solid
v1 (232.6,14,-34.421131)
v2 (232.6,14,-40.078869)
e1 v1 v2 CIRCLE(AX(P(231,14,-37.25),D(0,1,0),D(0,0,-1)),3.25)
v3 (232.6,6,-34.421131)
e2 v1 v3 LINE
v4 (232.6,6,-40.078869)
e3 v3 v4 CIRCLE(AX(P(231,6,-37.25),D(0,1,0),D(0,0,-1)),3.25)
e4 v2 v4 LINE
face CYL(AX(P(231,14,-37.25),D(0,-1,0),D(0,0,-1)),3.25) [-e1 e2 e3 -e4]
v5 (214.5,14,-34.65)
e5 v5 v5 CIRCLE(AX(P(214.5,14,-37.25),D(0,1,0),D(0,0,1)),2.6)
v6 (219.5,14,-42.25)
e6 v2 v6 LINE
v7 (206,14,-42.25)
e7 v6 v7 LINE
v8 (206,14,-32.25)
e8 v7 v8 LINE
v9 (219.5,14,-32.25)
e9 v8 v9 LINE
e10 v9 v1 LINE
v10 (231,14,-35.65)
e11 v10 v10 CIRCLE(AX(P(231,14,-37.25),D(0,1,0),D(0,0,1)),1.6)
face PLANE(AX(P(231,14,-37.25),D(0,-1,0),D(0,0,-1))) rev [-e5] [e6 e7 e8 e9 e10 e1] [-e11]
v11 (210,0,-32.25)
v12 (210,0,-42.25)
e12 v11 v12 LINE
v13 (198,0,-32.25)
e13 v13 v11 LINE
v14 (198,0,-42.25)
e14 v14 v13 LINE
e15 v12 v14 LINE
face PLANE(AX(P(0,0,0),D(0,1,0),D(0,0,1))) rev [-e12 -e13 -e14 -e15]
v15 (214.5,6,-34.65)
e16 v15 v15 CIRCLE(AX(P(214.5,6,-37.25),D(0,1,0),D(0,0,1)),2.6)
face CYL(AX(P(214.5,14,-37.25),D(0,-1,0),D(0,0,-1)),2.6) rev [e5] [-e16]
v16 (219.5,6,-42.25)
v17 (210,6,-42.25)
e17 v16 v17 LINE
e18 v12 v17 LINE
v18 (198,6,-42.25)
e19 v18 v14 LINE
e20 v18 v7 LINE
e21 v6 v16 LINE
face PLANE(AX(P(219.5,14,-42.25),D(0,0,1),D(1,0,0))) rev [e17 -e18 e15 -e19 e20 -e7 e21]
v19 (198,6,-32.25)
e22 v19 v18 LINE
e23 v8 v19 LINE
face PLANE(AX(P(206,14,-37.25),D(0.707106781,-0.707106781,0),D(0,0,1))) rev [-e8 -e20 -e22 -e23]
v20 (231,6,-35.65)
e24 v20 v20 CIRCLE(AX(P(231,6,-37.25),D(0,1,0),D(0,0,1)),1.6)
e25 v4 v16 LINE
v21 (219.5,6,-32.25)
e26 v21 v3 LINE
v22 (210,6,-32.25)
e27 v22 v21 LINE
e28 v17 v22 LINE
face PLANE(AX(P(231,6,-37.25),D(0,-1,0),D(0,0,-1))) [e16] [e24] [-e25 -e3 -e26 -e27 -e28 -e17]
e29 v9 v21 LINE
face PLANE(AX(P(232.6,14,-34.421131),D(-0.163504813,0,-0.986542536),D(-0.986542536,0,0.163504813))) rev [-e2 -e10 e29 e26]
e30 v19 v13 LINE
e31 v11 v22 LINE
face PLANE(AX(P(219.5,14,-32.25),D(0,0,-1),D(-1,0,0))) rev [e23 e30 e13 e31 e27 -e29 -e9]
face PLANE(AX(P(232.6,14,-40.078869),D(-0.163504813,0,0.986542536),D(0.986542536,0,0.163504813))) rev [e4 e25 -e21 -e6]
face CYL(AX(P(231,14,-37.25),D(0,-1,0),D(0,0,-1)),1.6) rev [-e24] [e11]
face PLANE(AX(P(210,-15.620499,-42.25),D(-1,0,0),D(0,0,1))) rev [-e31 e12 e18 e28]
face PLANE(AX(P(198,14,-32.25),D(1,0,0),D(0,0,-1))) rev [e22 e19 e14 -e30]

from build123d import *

# Parameters (mm, degrees)
SKETCH1_R             = 5.9875
SKETCH1_R_2           = 1.7
SKETCH1_R_3           = 1.6
BOSS_EXTRUDE1_DEPTH   = 6
MOVE_FACE1_BY         = 5
MOVE_FACE1_2_BY       = 5
MOVE_FACE1_3_BY       = 5
MOVE_FACE1_4_BY       = 5
M4X0_7_TAPPED_HOLE2_D = 3.3
POCKET_WALLS_DEPTH    = 2.6
RIB_PATTERN_DEPTH     = 3
MOVE_FACE2_BY         = 4.5
MOVE_FACE2_2_BY       = 4.5
MOVE_FACE2_3_BY       = 4.5
MOVE_FACE2_4_BY       = 4.5
MOVE_FACE2_5_BY       = 4.5
MOVE_FACE2_6_BY       = 4.5
MOVE_FACE2_7_BY       = 4.5
MOVE_FACE2_8_BY       = 4.5
MOVE_FACE2_9_BY       = 4.5
MOVE_FACE2_10_BY      = 4.5
MOVE_FACE2_11_BY      = 4.5
MOVE_FACE2_12_BY      = 4.5
MOVE_FACE2_13_BY      = 4.5
MOVE_FACE2_14_BY      = 4.5
BOSS_EXTRUDE6_REACH   = 382.427
SKETCH19_W            = 1
SKETCH19_H            = 3
BOSS_EXTRUDE7_REACH   = 375.768
SKETCH20_W            = 1
SKETCH20_H            = 3
CUT_EXTRUDE4_DEPTH    = 4.5
POCKET_FILLETS_R      = 2.5
FILLET9_R             = 3
MOVE_FACE3_BY         = 12
MOVE_FACE3_2_BY       = 12
SKETCH23_W            = 12
SKETCH23_H            = 38.175
CUT_EXTRUDE5_DEPTH    = 245.489391385
MOVE_FACE4_BY         = 4
MOVE_FACE4_2_BY       = 4
FILLET6_R             = 5
FILLET7_R             = 11
FILLET8_START         = -1
FILLET8_DEPTH         = 8
FILLET8_2_DEPTH       = 6
SKETCH25_R            = 1.6
SKETCH25_R_2          = 2.6
BOSS_EXTRUDE9_DEPTH   = 8
SKETCH26_W            = 12
SKETCH26_H            = 10
BOSS_EXTRUDE10_DEPTH  = 6
CHAMFER2_SIZE         = 8


with BuildPart() as part:
    # Sketch1 → Boss-Extrude1 (new body)
    with BuildSketch(Plane(origin=(0, 0, 0), x_dir=(1, 0, 0), z_dir=(0, 1, 0))):
        Polygon((-240, 46.25), (-198, 46.25), (-198, 26.5), (198, 26.5), (198, 46.25), (240, 46.25), (240, -18.75), (201, -18.75), (201, 0), (-201, 0), (-201, -18.75), (-240, -18.75), align=None)
        with Locations(Location((-231, 24.425, 0), (0, 0, 270))):
            Circle(SKETCH1_R, mode=Mode.SUBTRACT)
        with Locations(Location((-214.5, 37.25, 0), (0, 0, 270))):
            Circle(SKETCH1_R, mode=Mode.SUBTRACT)
        with Locations(Location((214.5, 37.25, 0), (0, 0, 90))):
            Circle(SKETCH1_R, mode=Mode.SUBTRACT)
        with Locations(Location((231, 24.425, 0), (0, 0, 90))):
            Circle(SKETCH1_R, mode=Mode.SUBTRACT)
        with Locations(Location((-204.5, -6.05, 0), (0, 0, 270))):
            Circle(SKETCH1_R_2, mode=Mode.SUBTRACT)
        with Locations(Location((-224.5, -6.05, 0), (0, 0, 270))):
            Circle(SKETCH1_R_2, mode=Mode.SUBTRACT)
        with Locations(Location((-204.5, 13.95, 0), (0, 0, 270))):
            Circle(SKETCH1_R_2, mode=Mode.SUBTRACT)
        with Locations(Location((-224.5, 13.95, 0), (0, 0, 270))):
            Circle(SKETCH1_R_2, mode=Mode.SUBTRACT)
        with Locations(Location((204.5, -6.05, 0), (0, 0, 90))):
            Circle(SKETCH1_R_2, mode=Mode.SUBTRACT)
        with Locations(Location((204.5, 13.95, 0), (0, 0, 90))):
            Circle(SKETCH1_R_2, mode=Mode.SUBTRACT)
        with Locations(Location((224.5, 13.95, 0), (0, 0, 90))):
            Circle(SKETCH1_R_2, mode=Mode.SUBTRACT)
        with Locations(Location((224.5, -6.05, 0), (0, 0, 90))):
            Circle(SKETCH1_R_2, mode=Mode.SUBTRACT)
        with Locations(Location((-187.5, 13.25, 0), (0, 0, 270))):
            Circle(SKETCH1_R_3, mode=Mode.SUBTRACT)
        with Locations(Location((-162.5, 13.25, 0), (0, 0, 270))):
            Circle(SKETCH1_R_3, mode=Mode.SUBTRACT)
        with Locations(Location((-137.5, 13.25, 0), (0, 0, 270))):
            Circle(SKETCH1_R_3, mode=Mode.SUBTRACT)
        with Locations(Location((-112.5, 13.25, 0), (0, 0, 270))):
            Circle(SKETCH1_R_3, mode=Mode.SUBTRACT)
        with Locations(Location((-87.5, 13.25, 0), (0, 0, 270))):
            Circle(SKETCH1_R_3, mode=Mode.SUBTRACT)
        with Locations(Location((-62.5, 13.25, 0), (0, 0, 270))):
            Circle(SKETCH1_R_3, mode=Mode.SUBTRACT)
        with Locations(Location((-37.5, 13.25, 0), (0, 0, 270))):
            Circle(SKETCH1_R_3, mode=Mode.SUBTRACT)
        with Locations(Location((-12.5, 13.25, 0), (0, 0, 270))):
            Circle(SKETCH1_R_3, mode=Mode.SUBTRACT)
        with Locations(Location((12.5, 13.25, 0), (0, 0, 270))):
            Circle(SKETCH1_R_3, mode=Mode.SUBTRACT)
        with Locations(Location((37.5, 13.25, 0), (0, 0, 270))):
            Circle(SKETCH1_R_3, mode=Mode.SUBTRACT)
        with Locations(Location((62.5, 13.25, 0), (0, 0, 270))):
            Circle(SKETCH1_R_3, mode=Mode.SUBTRACT)
        with Locations(Location((87.5, 13.25, 0), (0, 0, 270))):
            Circle(SKETCH1_R_3, mode=Mode.SUBTRACT)
        with Locations(Location((112.5, 13.25, 0), (0, 0, 270))):
            Circle(SKETCH1_R_3, mode=Mode.SUBTRACT)
        with Locations(Location((137.5, 13.25, 0), (0, 0, 270))):
            Circle(SKETCH1_R_3, mode=Mode.SUBTRACT)
        with Locations(Location((-231, 37.25, 0), (0, 0, 270))):
            Circle(SKETCH1_R_3, mode=Mode.SUBTRACT)
        with Locations(Location((231, 37.25, 0), (0, 0, 90))):
            Circle(SKETCH1_R_3, mode=Mode.SUBTRACT)
        with Locations(Location((162.5, 13.25, 0), (0, 0, 270))):
            Circle(SKETCH1_R_3, mode=Mode.SUBTRACT)
        with Locations(Location((187.5, 13.25, 0), (0, 0, 270))):
            Circle(SKETCH1_R_3, mode=Mode.SUBTRACT)
    extrude(amount=BOSS_EXTRUDE1_DEPTH)

    # Move Face1: a curved face moved outward by 5.0
    add(Solid.thicken(part.faces().sort_by_distance((231, 3, -18.4375))[0], MOVE_FACE1_BY))

    # Move Face1 2: a curved face moved outward by 5.0
    add(Solid.thicken(part.faces().sort_by_distance((214.5, 3, -31.2625))[0], MOVE_FACE1_2_BY))

    # Move Face1 3: a curved face moved outward by 5.0
    add(Solid.thicken(part.faces().sort_by_distance((-214.5, 3, -43.2375))[0], MOVE_FACE1_3_BY))

    # Move Face1 4: a curved face moved outward by 5.0
    add(Solid.thicken(part.faces().sort_by_distance((-231, 3, -30.4125))[0], MOVE_FACE1_4_BY))

    # M4x0.7 Tapped Hole2 (through all)
    with Locations(Plane(origin=(0, 6, 0), x_dir=(1, 0, 0), z_dir=(0, 1, 0))):
        with Locations((-214.5, 37.25), (-231, 24.425), (231, 24.425), (214.5, 37.25)):
            Hole(M4X0_7_TAPPED_HOLE2_D / 2)

    # Sketch13 → Pocket Walls (add)
    with BuildSketch(Plane.XY):
        Polygon((-214, 6), (-208.803847577, 9), (208.803847577, 9), (214, 6), align=None)
    pocket_walls = extrude(amount=-POCKET_WALLS_DEPTH)

    # Mirror1: Pocket Walls across plane
    add(pocket_walls.mirror(Plane.XY.offset(-13.25)))

    # zig_zag_style_1 → Rib Pattern (add)
    with BuildSketch(Plane(origin=(0, 6, 0), x_dir=(1, 0, 0), z_dir=(0, 1, 0))):
        Polygon((-186.851468198, 1.838812439), (-162.5, 22.586263345), (-137.5, 1.286263345), (-112.5, 22.586263345), (-87.5, 1.286263345), (-62.5, 22.586263345), (-37.5, 1.286263345), (-12.5, 22.586263345), (12.5, 1.286263345), (37.5, 22.586263345), (62.5, 1.286263345), (87.5, 22.586263345), (112.5, 1.286263345), (137.5, 22.586263345), (162.5, 1.286263345), (188.148531802, 23.138812439), (186.851468198, 24.661187561), (162.5, 3.913736655), (137.5, 25.213736655), (112.5, 3.913736655), (87.5, 25.213736655), (62.5, 3.913736655), (37.5, 25.213736655), (12.5, 3.913736655), (-12.5, 25.213736655), (-37.5, 3.913736655), (-62.5, 25.213736655), (-87.5, 3.913736655), (-112.5, 25.213736655), (-137.5, 3.913736655), (-162.5, 25.213736655), (-188.148531802, 3.361187561), align=None)
    extrude(amount=RIB_PATTERN_DEPTH)

    # Move Face2: a face moved inward by 4.5
    extrude(part.faces().sort_by_distance((162.5, 6, -17.307514961))[0], amount=MOVE_FACE2_BY, dir=(0, -1, 0), mode=Mode.SUBTRACT)

    # Move Face2 2: a face moved inward by 4.5
    extrude(part.faces().sort_by_distance((137.5, 6, -9.192485039))[0], amount=MOVE_FACE2_2_BY, dir=(0, -1, 0), mode=Mode.SUBTRACT)

    # Move Face2 3: a face moved inward by 4.5
    extrude(part.faces().sort_by_distance((112.5, 6, -17.307514961))[0], amount=MOVE_FACE2_3_BY, dir=(0, -1, 0), mode=Mode.SUBTRACT)

    # Move Face2 4: a face moved inward by 4.5
    extrude(part.faces().sort_by_distance((87.5, 6, -9.192485039))[0], amount=MOVE_FACE2_4_BY, dir=(0, -1, 0), mode=Mode.SUBTRACT)

    # Move Face2 5: a face moved inward by 4.5
    extrude(part.faces().sort_by_distance((62.5, 6, -17.307514961))[0], amount=MOVE_FACE2_5_BY, dir=(0, -1, 0), mode=Mode.SUBTRACT)

    # Move Face2 6: a face moved inward by 4.5
    extrude(part.faces().sort_by_distance((37.5, 6, -9.192485039))[0], amount=MOVE_FACE2_6_BY, dir=(0, -1, 0), mode=Mode.SUBTRACT)

    # Move Face2 7: a face moved inward by 4.5
    extrude(part.faces().sort_by_distance((12.5, 6, -17.307514961))[0], amount=MOVE_FACE2_7_BY, dir=(0, -1, 0), mode=Mode.SUBTRACT)

    # Move Face2 8: a face moved inward by 4.5
    extrude(part.faces().sort_by_distance((-12.5, 6, -9.192485039))[0], amount=MOVE_FACE2_8_BY, dir=(0, -1, 0), mode=Mode.SUBTRACT)

    # Move Face2 9: a face moved inward by 4.5
    extrude(part.faces().sort_by_distance((-37.5, 6, -17.307514961))[0], amount=MOVE_FACE2_9_BY, dir=(0, -1, 0), mode=Mode.SUBTRACT)

    # Move Face2 10: a face moved inward by 4.5
    extrude(part.faces().sort_by_distance((-62.5, 6, -9.192485039))[0], amount=MOVE_FACE2_10_BY, dir=(0, -1, 0), mode=Mode.SUBTRACT)

    # Move Face2 11: a face moved inward by 4.5
    extrude(part.faces().sort_by_distance((-87.5, 6, -17.307514961))[0], amount=MOVE_FACE2_11_BY, dir=(0, -1, 0), mode=Mode.SUBTRACT)

    # Move Face2 12: a face moved inward by 4.5
    extrude(part.faces().sort_by_distance((-112.5, 6, -9.192485039))[0], amount=MOVE_FACE2_12_BY, dir=(0, -1, 0), mode=Mode.SUBTRACT)

    # Move Face2 13: a face moved inward by 4.5
    extrude(part.faces().sort_by_distance((-162.5, 6, -9.192485039))[0], amount=MOVE_FACE2_13_BY, dir=(0, -1, 0), mode=Mode.SUBTRACT)

    # Move Face2 14: a face moved inward by 4.5
    extrude(part.faces().sort_by_distance((-137.5, 6, -17.307514961))[0], amount=MOVE_FACE2_14_BY, dir=(0, -1, 0), mode=Mode.SUBTRACT)

    # Boss-Extrude6: up to this face of the body (flat: up to its plane)
    boss_extrude6_end = Plane(part.part.faces().sort_by_distance((199.498029235, 7.445651316, -23.9))[0])
    # Sketch19 → Boss-Extrude6 (add, up to the picked face)
    with BuildSketch(Plane(origin=(120.437057913, 0, -102.612373342), x_dir=(-0.6485318015860708, 0, -0.7611875605470214), z_dir=(0.7611875605470213, 0, -0.6485318015860707)), mode=Mode.PRIVATE) as boss_extrude6_sk1:
        with Locations((-103.9073301, 7.5)):
            Rectangle(SKETCH19_W, SKETCH19_H)
    boss_extrude6_tool1 = split(extrude(boss_extrude6_sk1.sketch, amount=BOSS_EXTRUDE6_REACH, mode=Mode.PRIVATE), bisect_by=boss_extrude6_end, keep=Keep.BOTH, mode=Mode.PRIVATE)
    add(boss_extrude6_tool1.solids().sort_by(Axis((187.824266, 7.5, -23.519406), (0.7611875605470213, 0, -0.6485318015860707)))[0])

    # Boss-Extrude7: up to this face of the body (flat: up to its plane)
    boss_extrude7_end = Plane(part.part.faces().sort_by_distance((-199.498029235, 7.445651316, -2.6))[0])
    # Sketch20 → Boss-Extrude7 (add, up to the picked face)
    with BuildSketch(Plane(origin=(-107.355217903, 0, 91.466645654), x_dir=(0.6485318015860708, 0, 0.7611875605470213), z_dir=(-0.7611875605470213, 0, 0.6485318015860708)), mode=Mode.PRIVATE) as boss_extrude7_sk1:
        with Locations((-124.078800455, 7.5)):
            Rectangle(SKETCH20_W, SKETCH20_H)
    boss_extrude7_tool1 = split(extrude(boss_extrude7_sk1.sketch, amount=BOSS_EXTRUDE7_REACH, mode=Mode.PRIVATE), bisect_by=boss_extrude7_end, keep=Keep.BOTH, mode=Mode.PRIVATE)
    add(boss_extrude7_tool1.solids().sort_by(Axis((-187.824266, 7.5, -2.980594), (-0.7611875605470213, 0, 0.6485318015860708)))[0])

    # Sketch22 → Cut-Extrude4 (cut)
    with BuildSketch(Plane(origin=(0, 6, 0), x_dir=(1, 0, 0), z_dir=(0, 1, 0))):
        Polygon((-201, 2.6), (-201, 23.9), (-164.041944431, 23.9), (-189.041944431, 2.6), align=None)
        Polygon((201, 2.6), (201, 23.9), (189.041944431, 23.9), (164.041944431, 2.6), align=None)
    extrude(amount=-CUT_EXTRUDE4_DEPTH, mode=Mode.SUBTRACT)

    # Pocket FIllets
    pocket_fillets_edges = [part.edges().sort_by_distance(p)[0] for p in [
        (185.958055569, 5.25, -23.9),
        (139.041944431, 5.25, -23.9),
        (135.958055569, 5.25, -23.9),
        (89.041944431, 5.25, -23.9),
        (85.958055569, 5.25, -23.9),
        (39.041944431, 5.25, -23.9),
        (35.958055569, 5.25, -23.9),
        (-10.958055569, 5.25, -23.9),
        (-14.041944431, 5.25, -23.9),
        (-60.958055569, 5.25, -23.9),
        (-64.041944431, 5.25, -23.9),
        (-110.958055569, 5.25, -23.9),
        (-114.041944431, 5.25, -23.9),
        (-160.958055569, 5.25, -23.9),
        (-164.041944431, 5.25, -23.9),
        (164.041944431, 5.25, -2.6),
        (-185.958055569, 5.25, -2.6),
        (-139.041944431, 5.25, -2.6),
        (-135.958055569, 5.25, -2.6),
        (-89.041944431, 5.25, -2.6),
        (-85.958055569, 5.25, -2.6),
        (-39.041944431, 5.25, -2.6),
        (-35.958055569, 5.25, -2.6),
        (10.958055569, 5.25, -2.6),
        (14.041944431, 5.25, -2.6),
        (60.958055569, 5.25, -2.6),
        (64.041944431, 5.25, -2.6),
        (110.958055569, 5.25, -2.6),
        (114.041944431, 5.25, -2.6),
        (160.958055569, 5.25, -2.6),
        (137.5, 5.25, -22.586263345),
        (87.5, 5.25, -22.586263345),
        (37.5, 5.25, -22.586263345),
        (-12.5, 5.25, -22.586263345),
        (-62.5, 5.25, -22.586263345),
        (-112.5, 5.25, -22.586263345),
        (-162.5, 5.25, -22.586263345),
        (-137.5, 5.25, -3.913736655),
        (-87.5, 5.25, -3.913736655),
        (-37.5, 5.25, -3.913736655),
        (12.5, 5.25, -3.913736655),
        (62.5, 5.25, -3.913736655),
        (112.5, 5.25, -3.913736655),
        (162.5, 5.25, -3.913736655),
        (189.041944431, 5.25, -23.9),
        (-189.041944431, 5.25, -2.6),
    ]]
    fillet(pocket_fillets_edges, radius=POCKET_FILLETS_R)

    # Fillet9
    fillet9_edges = [part.edges().sort_by_distance(p)[0] for p in [
        (-201, 3.75, -2.6),
        (-201, 3.75, -23.9),
        (201, 3.75, -2.6),
        (201, 3.75, -23.9),
    ]]
    fillet(fillet9_edges, radius=FILLET9_R)

    # Move Face3: a face moved inward by 12.0
    extrude(part.faces().sort_by_distance((198, 3, -36.375))[0], amount=MOVE_FACE3_BY, dir=(1, 0, 0), mode=Mode.SUBTRACT)

    # Move Face3 2: a face moved inward by 12.0
    extrude(part.faces().sort_by_distance((-198, 3, -36.375))[0], amount=MOVE_FACE3_2_BY, dir=(-1, 0, 0), mode=Mode.SUBTRACT)

    # Sketch23 → Cut-Extrude5 (cut, through all)
    with BuildSketch(Plane(origin=(0, 6, 0), x_dir=(1, 0, 0), z_dir=(0, 1, 0))):
        with Locations((-234, 0.3375)):
            Rectangle(SKETCH23_W, SKETCH23_H)
        with Locations((234, 0.3375)):
            Rectangle(SKETCH23_W, SKETCH23_H)
    extrude(amount=-CUT_EXTRUDE5_DEPTH, mode=Mode.SUBTRACT)

    # Move Face4: a face moved inward by 4.0
    extrude(part.faces().sort_by_distance((-240, 3, -32.8375))[0], amount=MOVE_FACE4_BY, dir=(1, 0, 0), mode=Mode.SUBTRACT)

    # Move Face4 2: a face moved inward by 4.0
    extrude(part.faces().sort_by_distance((240, 3, -32.8375))[0], amount=MOVE_FACE4_2_BY, dir=(-1, 0, 0), mode=Mode.SUBTRACT)

    # Fillet6
    fillet6_edges = [part.edges().sort_by_distance(p)[0] for p in [
        (-210, 3, -46.25),
        (-210, 3, -26.5),
        (210, 3, -26.5),
        (210, 3, -46.25),
        (201, 3, 18.75),
        (201, 3, 0),
        (-201, 3, 0),
        (-201, 3, 18.75),
        (-228, 3, 18.75),
        (228, 3, 18.75),
    ]]
    fillet(fillet6_edges, radius=FILLET6_R)

    # Fillet7
    fillet7_edges = [part.edges().sort_by_distance(p)[0] for p in [
        (-236, 3, -46.25),
        (236, 3, -46.25),
    ]]
    fillet(fillet7_edges, radius=FILLET7_R)

    # Fillet8: read off the stored shape, not the designer's step
    # Fillet8 outline → Fillet8 (cut)
    with BuildSketch(Plane(origin=(0, 0, 0), x_dir=(1, 0, 0), z_dir=(0, 1, 0)).offset(FILLET8_START)):
        with BuildLine():
            Line((-236, 19.425), (-232, 19.425))
            ThreePointArc((-232, 19.425), (-234.828427125, 20.596572875), (-236, 23.425))
            Line((-236, 23.425), (-236, 19.425))
        make_face()
        with BuildLine():
            ThreePointArc((236, 23.425), (234.828427125, 20.596572875), (232, 19.425))
            Line((232, 19.425), (236, 19.425))
            Line((236, 19.425), (236, 23.425))
        make_face()
    extrude(amount=FILLET8_DEPTH, mode=Mode.SUBTRACT)

    # Fillet8 2 outline → Fillet8 2 (add)
    with BuildSketch(Plane(origin=(0, 0, 0), x_dir=(1, 0, 0), z_dir=(0, 1, 0))):
        with BuildLine():
            Line((-228, 19.425), (-232, 19.425))
            ThreePointArc((-232, 19.425), (-229.171572875, 18.253427125), (-228, 15.425))
            Line((-228, 15.425), (-228, 19.425))
        make_face()
        with BuildLine():
            Line((228, 19.425), (228, 15.425))
            ThreePointArc((228, 15.425), (229.171572875, 18.253427125), (232, 19.425))
            Line((232, 19.425), (228, 19.425))
        make_face()
    extrude(amount=FILLET8_2_DEPTH)


with BuildPart() as body_2:
    # Sketch25 → Boss-Extrude9 (new body)
    with BuildSketch(Plane(origin=(0, 6, 0), x_dir=(1, 0, 0), z_dir=(0, 1, 0))):
        with BuildLine():
            Line((198, 32.25), (198, 42.25))
            Line((198, 42.25), (219.5, 42.25))
            Line((219.5, 42.25), (232.6, 40.078869032))
            ThreePointArc((232.6, 40.078869032), (234.25, 37.25), (232.6, 34.421130968))
            Line((232.6, 34.421130968), (219.5, 32.25))
            Line((219.5, 32.25), (198, 32.25))
        make_face()
        with Locations(Location((231, 37.25, 0), (0, 0, 270))):
            Circle(SKETCH25_R, mode=Mode.SUBTRACT)
        with Locations(Location((214.5, 37.25, 0), (0, 0, 270))):
            Circle(SKETCH25_R_2, mode=Mode.SUBTRACT)
    extrude(amount=BOSS_EXTRUDE9_DEPTH)

    # Sketch26 → Boss-Extrude10 (add)
    with BuildSketch(Plane.XZ.offset(-6)):
        with Locations((204, -37.25)):
            Rectangle(SKETCH26_W, SKETCH26_H)
    extrude(amount=BOSS_EXTRUDE10_DEPTH)

    # Chamfer2
    chamfer2_edges = [body_2.edges().sort_by_distance(p)[0] for p in [
        (198, 14, -37.25),
    ]]
    chamfer(chamfer2_edges, length=CHAMFER2_SIZE)


solid = body_2.part
